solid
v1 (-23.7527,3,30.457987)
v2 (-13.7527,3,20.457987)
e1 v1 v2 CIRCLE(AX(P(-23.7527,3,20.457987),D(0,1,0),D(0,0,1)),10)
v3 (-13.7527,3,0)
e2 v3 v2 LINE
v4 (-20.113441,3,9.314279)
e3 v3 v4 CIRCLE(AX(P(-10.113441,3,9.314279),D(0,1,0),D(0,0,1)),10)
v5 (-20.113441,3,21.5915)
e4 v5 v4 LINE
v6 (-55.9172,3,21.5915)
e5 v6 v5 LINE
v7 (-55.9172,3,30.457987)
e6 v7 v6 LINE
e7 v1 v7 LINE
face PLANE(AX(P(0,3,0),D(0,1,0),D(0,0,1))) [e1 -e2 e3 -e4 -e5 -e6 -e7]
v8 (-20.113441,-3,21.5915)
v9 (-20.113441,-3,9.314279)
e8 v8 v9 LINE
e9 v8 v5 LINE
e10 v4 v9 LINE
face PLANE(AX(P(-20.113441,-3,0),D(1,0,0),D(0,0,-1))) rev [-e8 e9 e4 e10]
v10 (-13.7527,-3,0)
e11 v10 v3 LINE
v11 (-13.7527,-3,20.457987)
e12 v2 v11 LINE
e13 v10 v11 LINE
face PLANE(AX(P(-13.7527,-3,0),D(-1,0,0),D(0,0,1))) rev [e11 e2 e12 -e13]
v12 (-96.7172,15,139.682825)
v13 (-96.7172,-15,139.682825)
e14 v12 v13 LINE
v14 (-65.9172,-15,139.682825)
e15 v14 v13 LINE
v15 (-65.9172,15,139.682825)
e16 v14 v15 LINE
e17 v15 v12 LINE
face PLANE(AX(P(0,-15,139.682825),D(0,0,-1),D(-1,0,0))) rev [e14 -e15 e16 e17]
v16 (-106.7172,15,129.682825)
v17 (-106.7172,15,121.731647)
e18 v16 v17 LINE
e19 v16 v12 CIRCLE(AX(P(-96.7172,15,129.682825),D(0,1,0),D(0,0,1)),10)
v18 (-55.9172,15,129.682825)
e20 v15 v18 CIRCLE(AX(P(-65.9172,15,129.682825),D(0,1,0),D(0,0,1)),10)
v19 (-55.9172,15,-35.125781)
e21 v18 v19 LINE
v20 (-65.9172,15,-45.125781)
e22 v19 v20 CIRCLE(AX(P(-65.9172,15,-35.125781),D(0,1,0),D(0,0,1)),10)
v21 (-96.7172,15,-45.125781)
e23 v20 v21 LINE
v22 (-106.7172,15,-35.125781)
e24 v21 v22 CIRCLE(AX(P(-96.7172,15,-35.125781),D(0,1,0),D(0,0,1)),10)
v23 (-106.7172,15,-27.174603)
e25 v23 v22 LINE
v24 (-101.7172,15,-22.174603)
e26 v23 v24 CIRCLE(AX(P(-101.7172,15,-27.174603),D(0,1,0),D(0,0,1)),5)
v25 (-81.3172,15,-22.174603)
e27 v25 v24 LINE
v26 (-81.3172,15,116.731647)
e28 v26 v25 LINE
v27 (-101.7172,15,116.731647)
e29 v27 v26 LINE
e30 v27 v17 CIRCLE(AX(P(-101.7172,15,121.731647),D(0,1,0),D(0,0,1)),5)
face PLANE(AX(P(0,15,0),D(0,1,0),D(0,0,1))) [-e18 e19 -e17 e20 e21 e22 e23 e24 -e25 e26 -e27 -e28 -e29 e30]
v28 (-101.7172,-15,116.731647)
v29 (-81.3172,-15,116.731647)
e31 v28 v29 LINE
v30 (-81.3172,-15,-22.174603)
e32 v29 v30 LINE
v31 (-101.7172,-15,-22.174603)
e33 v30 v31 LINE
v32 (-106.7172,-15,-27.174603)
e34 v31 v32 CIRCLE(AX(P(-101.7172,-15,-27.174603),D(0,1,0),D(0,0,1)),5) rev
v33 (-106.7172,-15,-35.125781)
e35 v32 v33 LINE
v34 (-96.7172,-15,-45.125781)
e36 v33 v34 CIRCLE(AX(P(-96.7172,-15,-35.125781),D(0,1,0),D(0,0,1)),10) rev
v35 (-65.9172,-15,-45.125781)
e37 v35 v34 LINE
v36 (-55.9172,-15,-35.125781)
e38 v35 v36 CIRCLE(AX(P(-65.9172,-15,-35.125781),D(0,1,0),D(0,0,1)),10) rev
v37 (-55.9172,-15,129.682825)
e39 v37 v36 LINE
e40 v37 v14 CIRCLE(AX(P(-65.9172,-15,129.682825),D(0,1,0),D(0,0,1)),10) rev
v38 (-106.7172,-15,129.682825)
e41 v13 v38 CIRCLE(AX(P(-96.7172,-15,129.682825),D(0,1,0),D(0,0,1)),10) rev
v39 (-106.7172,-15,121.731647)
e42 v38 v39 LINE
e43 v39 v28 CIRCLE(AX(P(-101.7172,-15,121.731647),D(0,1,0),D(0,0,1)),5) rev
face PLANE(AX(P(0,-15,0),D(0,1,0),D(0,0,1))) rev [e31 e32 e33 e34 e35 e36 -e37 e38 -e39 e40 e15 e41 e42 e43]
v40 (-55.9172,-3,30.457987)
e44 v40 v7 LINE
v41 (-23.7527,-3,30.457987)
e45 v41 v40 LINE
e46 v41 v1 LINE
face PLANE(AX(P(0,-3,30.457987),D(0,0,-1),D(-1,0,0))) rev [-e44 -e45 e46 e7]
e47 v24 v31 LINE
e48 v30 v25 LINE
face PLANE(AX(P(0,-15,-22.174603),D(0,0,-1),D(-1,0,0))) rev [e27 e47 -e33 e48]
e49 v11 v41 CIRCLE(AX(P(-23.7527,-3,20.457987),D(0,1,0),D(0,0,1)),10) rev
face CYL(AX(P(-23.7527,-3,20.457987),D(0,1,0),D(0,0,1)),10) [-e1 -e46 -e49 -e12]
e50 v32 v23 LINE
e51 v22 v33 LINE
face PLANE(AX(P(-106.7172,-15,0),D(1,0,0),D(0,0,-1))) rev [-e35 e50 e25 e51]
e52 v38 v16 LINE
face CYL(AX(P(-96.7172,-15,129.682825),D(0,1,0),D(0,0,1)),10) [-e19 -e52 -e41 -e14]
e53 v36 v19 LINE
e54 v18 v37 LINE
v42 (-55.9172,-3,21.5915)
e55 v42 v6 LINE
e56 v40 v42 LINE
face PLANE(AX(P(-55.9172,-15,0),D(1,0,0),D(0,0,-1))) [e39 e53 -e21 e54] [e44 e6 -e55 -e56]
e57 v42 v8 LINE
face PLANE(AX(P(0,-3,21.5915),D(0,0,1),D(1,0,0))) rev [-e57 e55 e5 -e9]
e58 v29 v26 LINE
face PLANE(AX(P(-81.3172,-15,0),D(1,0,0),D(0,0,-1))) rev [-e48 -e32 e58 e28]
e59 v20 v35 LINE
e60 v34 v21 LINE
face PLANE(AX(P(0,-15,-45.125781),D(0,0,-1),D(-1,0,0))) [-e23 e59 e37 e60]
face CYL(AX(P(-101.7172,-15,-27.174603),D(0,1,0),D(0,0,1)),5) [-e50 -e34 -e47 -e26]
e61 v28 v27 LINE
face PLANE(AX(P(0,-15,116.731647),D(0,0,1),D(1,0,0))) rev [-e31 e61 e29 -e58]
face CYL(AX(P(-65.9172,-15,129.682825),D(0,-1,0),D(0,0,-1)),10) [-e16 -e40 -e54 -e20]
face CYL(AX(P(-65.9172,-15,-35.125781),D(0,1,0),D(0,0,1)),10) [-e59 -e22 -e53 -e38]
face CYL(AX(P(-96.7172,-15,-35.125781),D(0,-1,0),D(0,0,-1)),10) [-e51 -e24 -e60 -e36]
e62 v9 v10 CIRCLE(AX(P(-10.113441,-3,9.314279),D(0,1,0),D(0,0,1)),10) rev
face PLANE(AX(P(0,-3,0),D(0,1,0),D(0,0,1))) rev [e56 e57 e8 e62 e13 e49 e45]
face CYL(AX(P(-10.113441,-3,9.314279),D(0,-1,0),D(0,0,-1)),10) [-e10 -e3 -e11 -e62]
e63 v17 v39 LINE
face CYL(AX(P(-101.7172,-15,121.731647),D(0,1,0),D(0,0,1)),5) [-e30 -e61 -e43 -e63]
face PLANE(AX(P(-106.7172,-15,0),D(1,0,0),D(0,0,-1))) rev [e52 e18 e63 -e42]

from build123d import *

# Parameters (mm, degrees)
BOSS_EXTRUDE1_DEPTH      = 15
BOSS_EXTRUDE1_DEPTH_BACK = 15
BOSS_EXTRUDE2_DEPTH      = 3
BOSS_EXTRUDE2_DEPTH_BACK = 3
FILLET1_R                = 10
FILLET2_R                = 5


with BuildPart() as part:
    # Sketch1 → Boss-Extrude1 (new, two sides: drawn at the far end of the back side and taken through both)
    with BuildSketch(Plane(origin=(0, 0, 0), x_dir=(1, 0, 0), z_dir=(0, 1, 0)).offset(-BOSS_EXTRUDE1_DEPTH_BACK)):
        Polygon((-106.717200023, 22.174603175), (-106.717200023, 45.125781111), (-55.917200023, 45.125781111), (-55.917200023, -139.682824762), (-106.717200023, -139.682824762), (-106.717200023, -116.731646825), (-81.317200023, -116.731646825), (-81.317200023, 22.174603175), align=None)
    extrude(amount=BOSS_EXTRUDE1_DEPTH + BOSS_EXTRUDE1_DEPTH_BACK)

    # Sketch1<3> → Boss-Extrude2 (add, two sides: drawn at the far end of the back side and taken through both)
    with BuildSketch(Plane(origin=(0, 0, 0), x_dir=(1, 0, 0), z_dir=(0, 1, 0)).offset(-BOSS_EXTRUDE2_DEPTH_BACK)):
        Polygon((-55.917200023, -21.59149981), (-55.917200023, -30.457986667), (-13.752700087, -30.457986667), (-13.752700087, 0), (-20.113440658, 0), (-20.113440658, -21.59149981), align=None)
    extrude(amount=BOSS_EXTRUDE2_DEPTH + BOSS_EXTRUDE2_DEPTH_BACK)

    # Fillet1
    # the kernel refuses this fillet: 10 mm, written as the material it takes off along each edge
    with BuildSketch(Plane(origin=(-106.717200023, 40, -45.125781111), x_dir=(0, 0, 1), z_dir=(0, -1, 0)), Plane(origin=(-55.917200023, 40, 139.682824762), x_dir=(0, 0, -1), z_dir=(0, -1, 0)), Plane(origin=(-55.917200023, 40, -45.125781111), x_dir=(-1, 0, 0), z_dir=(0, -1, 0)), Plane(origin=(-106.717200023, 40, 139.682824762), x_dir=(1, 0, 0), z_dir=(0, -1, 0))) as fillet1_piece_1:
        with BuildLine():
            CenterArc((FILLET1_R, -FILLET1_R), FILLET1_R, 90, 90)
            Line((0, -FILLET1_R), (-FILLET1_R * 0.02, -FILLET1_R))
            Line((-FILLET1_R * 0.02, -FILLET1_R), (-FILLET1_R * 0.02, FILLET1_R * 0.02))
            Line((-FILLET1_R * 0.02, FILLET1_R * 0.02), (FILLET1_R, FILLET1_R * 0.02))
            Line((FILLET1_R, FILLET1_R * 0.02), (FILLET1_R, 0))
        make_face()
    extrude(amount=80, mode=Mode.SUBTRACT)
    with BuildSketch(Plane(origin=(-13.752700087, -28, 30.457986667), x_dir=(-1, 0, 0), z_dir=(0, 1, 0))) as fillet1_piece_2:
        with BuildLine():
            CenterArc((FILLET1_R, -FILLET1_R), FILLET1_R, 90, 90)
            Line((0, -FILLET1_R), (-FILLET1_R * 0.02, -FILLET1_R))
            Line((-FILLET1_R * 0.02, -FILLET1_R), (-FILLET1_R * 0.02, FILLET1_R * 0.02))
            Line((-FILLET1_R * 0.02, FILLET1_R * 0.02), (FILLET1_R, FILLET1_R * 0.02))
            Line((FILLET1_R, FILLET1_R * 0.02), (FILLET1_R, 0))
        make_face()
    extrude(amount=56, mode=Mode.SUBTRACT)
    with BuildSketch(Plane(origin=(-20.113440658, 26.285697167, 0), x_dir=(1, 0, 0), z_dir=(0, -1, 0))) as fillet1_piece_3:
        with BuildLine():
            CenterArc((10, 9.314278867), FILLET1_R, 180, 68.658501665)
            Line((0, 9.314278867), (-0.2, 9.314278867))
            Line((-0.2, 9.314278867), (-0.2, 0))
            Line((-0.2, 0), (0, -0.2))
            ThreePointArc((0, -0.2), (3.180370286, -0.2), (6.287955383, -0.186285577))
            Line((6.287955383, -0.186285577), (6.360740571, 0))
        make_face()
    extrude(amount=52.571394335, mode=Mode.SUBTRACT)

    # Fillet2
    fillet2_edges = [part.edges().sort_by_distance(p)[0] for p in [
        (-106.717200023, 0, 116.731646825),
        (-106.717200023, 0, -22.174603175),
    ]]
    fillet(fillet2_edges, radius=FILLET2_R)


solid = part.part
